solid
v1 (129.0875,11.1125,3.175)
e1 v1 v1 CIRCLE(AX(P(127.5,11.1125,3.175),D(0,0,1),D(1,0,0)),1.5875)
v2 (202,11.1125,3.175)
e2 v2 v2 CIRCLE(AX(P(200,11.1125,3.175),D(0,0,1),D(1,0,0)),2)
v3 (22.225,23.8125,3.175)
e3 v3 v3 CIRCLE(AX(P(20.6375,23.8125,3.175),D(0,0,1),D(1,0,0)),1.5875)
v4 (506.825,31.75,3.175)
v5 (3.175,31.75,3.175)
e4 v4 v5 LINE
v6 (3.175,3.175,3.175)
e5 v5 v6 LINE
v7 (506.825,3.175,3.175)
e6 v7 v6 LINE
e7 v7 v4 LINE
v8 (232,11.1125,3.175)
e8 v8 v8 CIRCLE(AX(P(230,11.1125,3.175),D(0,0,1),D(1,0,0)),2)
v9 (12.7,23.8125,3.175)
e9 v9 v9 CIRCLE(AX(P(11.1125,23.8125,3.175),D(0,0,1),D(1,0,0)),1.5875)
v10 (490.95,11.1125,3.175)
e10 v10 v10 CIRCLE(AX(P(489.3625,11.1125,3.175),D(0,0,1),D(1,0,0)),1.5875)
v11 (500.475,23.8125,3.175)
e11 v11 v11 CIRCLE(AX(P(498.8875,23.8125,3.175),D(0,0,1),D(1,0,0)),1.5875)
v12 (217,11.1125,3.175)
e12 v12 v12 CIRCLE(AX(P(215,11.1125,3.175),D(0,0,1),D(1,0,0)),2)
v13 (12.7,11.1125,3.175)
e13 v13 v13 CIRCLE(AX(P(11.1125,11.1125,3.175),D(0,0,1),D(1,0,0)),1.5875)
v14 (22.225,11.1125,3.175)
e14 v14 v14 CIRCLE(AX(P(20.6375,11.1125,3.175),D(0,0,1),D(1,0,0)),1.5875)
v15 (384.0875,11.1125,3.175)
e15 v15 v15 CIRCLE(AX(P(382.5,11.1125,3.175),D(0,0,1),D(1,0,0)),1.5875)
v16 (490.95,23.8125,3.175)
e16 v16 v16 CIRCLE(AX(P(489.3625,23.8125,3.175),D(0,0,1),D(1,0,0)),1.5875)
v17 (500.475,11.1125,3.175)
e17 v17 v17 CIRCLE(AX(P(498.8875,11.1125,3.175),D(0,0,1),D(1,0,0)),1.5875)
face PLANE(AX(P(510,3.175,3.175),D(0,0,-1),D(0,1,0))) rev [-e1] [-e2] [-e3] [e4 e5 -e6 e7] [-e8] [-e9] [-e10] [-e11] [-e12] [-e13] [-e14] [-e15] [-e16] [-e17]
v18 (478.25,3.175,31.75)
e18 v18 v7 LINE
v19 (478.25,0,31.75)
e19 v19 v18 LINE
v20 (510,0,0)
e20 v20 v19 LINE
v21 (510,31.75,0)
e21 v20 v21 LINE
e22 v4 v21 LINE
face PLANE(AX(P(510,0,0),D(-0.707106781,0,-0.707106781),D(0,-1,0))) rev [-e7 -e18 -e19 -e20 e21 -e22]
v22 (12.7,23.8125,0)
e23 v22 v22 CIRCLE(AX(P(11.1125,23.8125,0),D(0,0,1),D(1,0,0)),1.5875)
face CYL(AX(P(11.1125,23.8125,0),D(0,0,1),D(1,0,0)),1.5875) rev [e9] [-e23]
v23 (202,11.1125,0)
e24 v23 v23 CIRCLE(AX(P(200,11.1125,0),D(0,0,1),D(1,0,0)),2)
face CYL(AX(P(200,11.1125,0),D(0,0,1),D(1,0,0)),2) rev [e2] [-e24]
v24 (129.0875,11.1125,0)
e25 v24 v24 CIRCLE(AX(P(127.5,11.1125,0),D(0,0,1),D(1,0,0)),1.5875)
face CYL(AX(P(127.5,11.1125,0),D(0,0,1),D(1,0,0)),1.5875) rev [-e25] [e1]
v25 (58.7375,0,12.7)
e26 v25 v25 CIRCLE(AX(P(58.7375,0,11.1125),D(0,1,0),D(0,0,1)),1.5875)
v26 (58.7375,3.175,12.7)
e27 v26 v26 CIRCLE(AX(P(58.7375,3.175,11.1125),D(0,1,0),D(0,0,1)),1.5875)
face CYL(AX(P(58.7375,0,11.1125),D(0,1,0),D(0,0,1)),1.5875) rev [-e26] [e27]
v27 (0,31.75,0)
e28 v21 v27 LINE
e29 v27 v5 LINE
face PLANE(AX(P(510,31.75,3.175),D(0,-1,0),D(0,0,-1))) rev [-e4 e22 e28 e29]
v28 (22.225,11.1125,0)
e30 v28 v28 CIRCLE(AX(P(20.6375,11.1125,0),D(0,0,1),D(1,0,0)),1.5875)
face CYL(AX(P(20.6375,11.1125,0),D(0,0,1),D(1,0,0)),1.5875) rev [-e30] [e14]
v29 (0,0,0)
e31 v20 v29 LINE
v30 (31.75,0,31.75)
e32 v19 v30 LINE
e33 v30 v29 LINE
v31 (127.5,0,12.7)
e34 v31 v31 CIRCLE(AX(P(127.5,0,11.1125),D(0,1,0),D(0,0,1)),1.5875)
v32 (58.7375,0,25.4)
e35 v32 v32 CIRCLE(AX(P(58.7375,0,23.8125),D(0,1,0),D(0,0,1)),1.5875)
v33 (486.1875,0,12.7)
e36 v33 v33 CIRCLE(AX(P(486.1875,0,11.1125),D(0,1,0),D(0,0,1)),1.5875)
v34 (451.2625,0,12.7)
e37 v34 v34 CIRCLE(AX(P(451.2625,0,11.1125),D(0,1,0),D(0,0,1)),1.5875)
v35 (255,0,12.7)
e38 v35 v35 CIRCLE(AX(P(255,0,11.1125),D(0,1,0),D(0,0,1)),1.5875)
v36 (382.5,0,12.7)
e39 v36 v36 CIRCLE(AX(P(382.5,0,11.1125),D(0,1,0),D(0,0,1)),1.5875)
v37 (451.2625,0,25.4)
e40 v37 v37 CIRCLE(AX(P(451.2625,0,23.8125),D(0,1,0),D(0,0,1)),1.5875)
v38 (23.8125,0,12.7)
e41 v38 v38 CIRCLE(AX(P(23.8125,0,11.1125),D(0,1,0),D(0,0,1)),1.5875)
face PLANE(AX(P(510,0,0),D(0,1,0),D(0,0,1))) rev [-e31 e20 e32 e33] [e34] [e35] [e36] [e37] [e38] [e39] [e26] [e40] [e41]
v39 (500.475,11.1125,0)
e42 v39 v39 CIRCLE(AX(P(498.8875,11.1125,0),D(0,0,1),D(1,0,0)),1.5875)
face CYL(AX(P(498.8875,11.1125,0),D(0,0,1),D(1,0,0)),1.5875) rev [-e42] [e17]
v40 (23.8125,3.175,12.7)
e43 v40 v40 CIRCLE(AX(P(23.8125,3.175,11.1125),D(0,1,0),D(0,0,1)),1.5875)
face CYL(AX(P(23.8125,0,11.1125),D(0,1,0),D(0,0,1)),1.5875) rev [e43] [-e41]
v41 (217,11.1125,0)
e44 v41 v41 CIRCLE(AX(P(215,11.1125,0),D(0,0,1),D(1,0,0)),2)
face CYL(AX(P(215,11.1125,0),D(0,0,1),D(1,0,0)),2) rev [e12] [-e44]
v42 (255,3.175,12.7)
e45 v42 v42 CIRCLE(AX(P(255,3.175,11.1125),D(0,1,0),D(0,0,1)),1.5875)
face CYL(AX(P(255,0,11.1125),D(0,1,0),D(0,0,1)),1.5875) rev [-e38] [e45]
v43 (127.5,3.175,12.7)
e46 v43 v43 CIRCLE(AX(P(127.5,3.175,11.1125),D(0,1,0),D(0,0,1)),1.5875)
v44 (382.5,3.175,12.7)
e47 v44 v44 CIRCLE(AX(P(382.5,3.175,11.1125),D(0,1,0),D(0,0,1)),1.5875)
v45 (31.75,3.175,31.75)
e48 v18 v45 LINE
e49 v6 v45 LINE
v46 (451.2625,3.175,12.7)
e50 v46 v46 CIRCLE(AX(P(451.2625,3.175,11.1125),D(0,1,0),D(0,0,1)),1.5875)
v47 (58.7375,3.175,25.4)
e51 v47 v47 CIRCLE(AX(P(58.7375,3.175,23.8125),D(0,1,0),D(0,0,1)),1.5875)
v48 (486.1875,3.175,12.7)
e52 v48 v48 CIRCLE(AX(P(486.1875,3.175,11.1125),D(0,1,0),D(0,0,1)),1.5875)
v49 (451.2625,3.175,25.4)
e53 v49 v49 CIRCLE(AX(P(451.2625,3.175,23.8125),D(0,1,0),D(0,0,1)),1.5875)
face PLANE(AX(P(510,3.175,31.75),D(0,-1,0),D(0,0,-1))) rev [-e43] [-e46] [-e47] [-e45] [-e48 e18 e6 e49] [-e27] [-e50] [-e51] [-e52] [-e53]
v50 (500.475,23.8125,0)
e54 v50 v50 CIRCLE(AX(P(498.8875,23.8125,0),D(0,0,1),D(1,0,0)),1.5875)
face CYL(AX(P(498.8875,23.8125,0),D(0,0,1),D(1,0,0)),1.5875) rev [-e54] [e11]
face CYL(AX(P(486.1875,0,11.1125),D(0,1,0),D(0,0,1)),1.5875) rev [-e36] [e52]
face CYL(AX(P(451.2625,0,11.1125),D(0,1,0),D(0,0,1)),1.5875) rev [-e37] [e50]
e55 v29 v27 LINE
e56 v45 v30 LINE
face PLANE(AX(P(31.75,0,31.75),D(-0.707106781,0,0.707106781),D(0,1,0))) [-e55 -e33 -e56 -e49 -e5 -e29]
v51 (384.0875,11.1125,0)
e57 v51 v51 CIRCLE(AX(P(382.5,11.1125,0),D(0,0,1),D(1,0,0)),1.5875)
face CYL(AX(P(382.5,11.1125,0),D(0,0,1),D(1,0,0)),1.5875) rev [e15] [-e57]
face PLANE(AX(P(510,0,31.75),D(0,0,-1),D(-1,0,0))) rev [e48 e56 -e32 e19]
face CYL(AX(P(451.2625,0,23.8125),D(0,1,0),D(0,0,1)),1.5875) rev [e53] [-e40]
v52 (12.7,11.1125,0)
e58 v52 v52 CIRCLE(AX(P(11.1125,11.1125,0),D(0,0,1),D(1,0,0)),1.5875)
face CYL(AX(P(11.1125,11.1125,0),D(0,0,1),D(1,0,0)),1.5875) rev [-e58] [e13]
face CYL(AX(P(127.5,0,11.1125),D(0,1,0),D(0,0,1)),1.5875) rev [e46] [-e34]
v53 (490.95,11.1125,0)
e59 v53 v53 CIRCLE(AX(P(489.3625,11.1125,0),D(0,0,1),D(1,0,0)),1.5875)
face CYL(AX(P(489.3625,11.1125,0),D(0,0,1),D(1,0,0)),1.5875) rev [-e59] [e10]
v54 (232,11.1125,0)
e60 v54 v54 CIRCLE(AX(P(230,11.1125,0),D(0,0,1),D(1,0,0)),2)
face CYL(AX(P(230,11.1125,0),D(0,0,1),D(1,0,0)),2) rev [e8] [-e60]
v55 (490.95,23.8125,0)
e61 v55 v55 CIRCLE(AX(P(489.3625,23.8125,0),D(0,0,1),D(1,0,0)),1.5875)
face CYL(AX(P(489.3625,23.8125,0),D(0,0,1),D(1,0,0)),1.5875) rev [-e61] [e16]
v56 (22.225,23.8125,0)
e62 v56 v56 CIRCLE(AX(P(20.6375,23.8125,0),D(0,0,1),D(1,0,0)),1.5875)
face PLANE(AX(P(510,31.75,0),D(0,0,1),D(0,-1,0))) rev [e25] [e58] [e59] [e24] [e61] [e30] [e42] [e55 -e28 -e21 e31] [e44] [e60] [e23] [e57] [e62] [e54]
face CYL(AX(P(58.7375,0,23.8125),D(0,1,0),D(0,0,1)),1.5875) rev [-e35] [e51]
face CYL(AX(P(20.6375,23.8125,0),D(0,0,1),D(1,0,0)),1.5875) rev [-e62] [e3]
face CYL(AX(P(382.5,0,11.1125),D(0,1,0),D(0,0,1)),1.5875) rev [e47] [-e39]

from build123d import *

# Parameters (mm, degrees)
BOSS_EXTRUDE1_DEPTH          = 510
CHAMFER6_SIZE                = 31.75
CHAMFER7_SIZE                = 31.75
TOPHOLES_SKETCH3_R           = 1.5875
TOPHOLES_CUT_EXTRUDE2_DEPTH  = 512.785690622
SIDEHOLES_SKETCH4_R          = 1.5875
SIDEHOLES_SKETCH4_R_2        = 2
SIDEHOLES_CUT_EXTRUDE3_DEPTH = 512.785690622


with BuildPart() as part:
    # Sketch1 → Boss-Extrude1 (new body)
    with BuildSketch(Plane(origin=(0, 0, 0), x_dir=(0, 0, -1), z_dir=(1, 0, 0))):
        Polygon((0, 0), (-31.75, 0), (-31.75, 3.175), (-3.175, 3.175), (-3.175, 31.75), (0, 31.75), align=None)
    extrude(amount=BOSS_EXTRUDE1_DEPTH)

    # Chamfer6
    chamfer6_edges = [part.edges().sort_by_distance(p)[0] for p in [
        (510, 1.5875, 31.75),
    ]]
    chamfer(chamfer6_edges, length=CHAMFER6_SIZE - 0.0001)  # a hair under: the kernel refuses the full size

    # Chamfer7
    chamfer7_edges = [part.edges().sort_by_distance(p)[0] for p in [
        (0, 1.5875, 31.75),
    ]]
    chamfer(chamfer7_edges, length=CHAMFER7_SIZE - 0.0001)  # a hair under: the kernel refuses the full size

    # TopHoles-Sketch3 → TopHoles-Cut-Extrude2 (cut, through all)
    with BuildSketch(Plane(origin=(0, 3.175, 0), x_dir=(1, 0, 0), z_dir=(0, 1, 0))):
        with Locations(Location((58.7375, -23.8125, 0), (0, 0, 270))):
            Circle(TOPHOLES_SKETCH3_R)
        with Locations(Location((451.2625, -23.8125, 0), (0, 0, 270))):
            Circle(TOPHOLES_SKETCH3_R)
        with Locations(Location((451.2625, -11.1125, 0), (0, 0, 270))):
            Circle(TOPHOLES_SKETCH3_R)
        with Locations(Location((58.7375, -11.1125, 0), (0, 0, 270))):
            Circle(TOPHOLES_SKETCH3_R)
        with Locations(Location((486.1875, -11.1125, 0), (0, 0, 270))):
            Circle(TOPHOLES_SKETCH3_R)
        with Locations(Location((23.8125, -11.1125, 0), (0, 0, 270))):
            Circle(TOPHOLES_SKETCH3_R)
        with Locations(Location((127.5, -11.1125, 0), (0, 0, 270))):
            Circle(TOPHOLES_SKETCH3_R)
        with Locations(Location((255, -11.1125, 0), (0, 0, 270))):
            Circle(TOPHOLES_SKETCH3_R)
        with Locations(Location((382.5, -11.1125, 0), (0, 0, 270))):
            Circle(TOPHOLES_SKETCH3_R)
    extrude(amount=-TOPHOLES_CUT_EXTRUDE2_DEPTH, mode=Mode.SUBTRACT)

    # SideHoles-Sketch4 → SideHoles-Cut-Extrude3 (cut, through all)
    with BuildSketch(Plane.XY.offset(3.175)):
        with Locations((11.1125, 23.8125)):
            Circle(SIDEHOLES_SKETCH4_R)
        with Locations((489.3625, 23.8125)):
            Circle(SIDEHOLES_SKETCH4_R)
        with Locations((20.6375, 23.8125)):
            Circle(SIDEHOLES_SKETCH4_R)
        with Locations((498.8875, 23.8125)):
            Circle(SIDEHOLES_SKETCH4_R)
        with Locations((11.1125, 11.1125)):
            Circle(SIDEHOLES_SKETCH4_R)
        with Locations((20.6375, 11.1125)):
            Circle(SIDEHOLES_SKETCH4_R)
        with Locations((489.3625, 11.1125)):
            Circle(SIDEHOLES_SKETCH4_R)
        with Locations((498.8875, 11.1125)):
            Circle(SIDEHOLES_SKETCH4_R)
        with Locations((200, 11.1125)):
            Circle(SIDEHOLES_SKETCH4_R_2)
        with Locations((215, 11.1125)):
            Circle(SIDEHOLES_SKETCH4_R_2)
        with Locations((230, 11.1125)):
            Circle(SIDEHOLES_SKETCH4_R_2)
        with Locations((127.5, 11.1125)):
            Circle(SIDEHOLES_SKETCH4_R)
        with Locations((382.5, 11.1125)):
            Circle(SIDEHOLES_SKETCH4_R)
    extrude(amount=-SIDEHOLES_CUT_EXTRUDE3_DEPTH, mode=Mode.SUBTRACT)


solid = part.part
